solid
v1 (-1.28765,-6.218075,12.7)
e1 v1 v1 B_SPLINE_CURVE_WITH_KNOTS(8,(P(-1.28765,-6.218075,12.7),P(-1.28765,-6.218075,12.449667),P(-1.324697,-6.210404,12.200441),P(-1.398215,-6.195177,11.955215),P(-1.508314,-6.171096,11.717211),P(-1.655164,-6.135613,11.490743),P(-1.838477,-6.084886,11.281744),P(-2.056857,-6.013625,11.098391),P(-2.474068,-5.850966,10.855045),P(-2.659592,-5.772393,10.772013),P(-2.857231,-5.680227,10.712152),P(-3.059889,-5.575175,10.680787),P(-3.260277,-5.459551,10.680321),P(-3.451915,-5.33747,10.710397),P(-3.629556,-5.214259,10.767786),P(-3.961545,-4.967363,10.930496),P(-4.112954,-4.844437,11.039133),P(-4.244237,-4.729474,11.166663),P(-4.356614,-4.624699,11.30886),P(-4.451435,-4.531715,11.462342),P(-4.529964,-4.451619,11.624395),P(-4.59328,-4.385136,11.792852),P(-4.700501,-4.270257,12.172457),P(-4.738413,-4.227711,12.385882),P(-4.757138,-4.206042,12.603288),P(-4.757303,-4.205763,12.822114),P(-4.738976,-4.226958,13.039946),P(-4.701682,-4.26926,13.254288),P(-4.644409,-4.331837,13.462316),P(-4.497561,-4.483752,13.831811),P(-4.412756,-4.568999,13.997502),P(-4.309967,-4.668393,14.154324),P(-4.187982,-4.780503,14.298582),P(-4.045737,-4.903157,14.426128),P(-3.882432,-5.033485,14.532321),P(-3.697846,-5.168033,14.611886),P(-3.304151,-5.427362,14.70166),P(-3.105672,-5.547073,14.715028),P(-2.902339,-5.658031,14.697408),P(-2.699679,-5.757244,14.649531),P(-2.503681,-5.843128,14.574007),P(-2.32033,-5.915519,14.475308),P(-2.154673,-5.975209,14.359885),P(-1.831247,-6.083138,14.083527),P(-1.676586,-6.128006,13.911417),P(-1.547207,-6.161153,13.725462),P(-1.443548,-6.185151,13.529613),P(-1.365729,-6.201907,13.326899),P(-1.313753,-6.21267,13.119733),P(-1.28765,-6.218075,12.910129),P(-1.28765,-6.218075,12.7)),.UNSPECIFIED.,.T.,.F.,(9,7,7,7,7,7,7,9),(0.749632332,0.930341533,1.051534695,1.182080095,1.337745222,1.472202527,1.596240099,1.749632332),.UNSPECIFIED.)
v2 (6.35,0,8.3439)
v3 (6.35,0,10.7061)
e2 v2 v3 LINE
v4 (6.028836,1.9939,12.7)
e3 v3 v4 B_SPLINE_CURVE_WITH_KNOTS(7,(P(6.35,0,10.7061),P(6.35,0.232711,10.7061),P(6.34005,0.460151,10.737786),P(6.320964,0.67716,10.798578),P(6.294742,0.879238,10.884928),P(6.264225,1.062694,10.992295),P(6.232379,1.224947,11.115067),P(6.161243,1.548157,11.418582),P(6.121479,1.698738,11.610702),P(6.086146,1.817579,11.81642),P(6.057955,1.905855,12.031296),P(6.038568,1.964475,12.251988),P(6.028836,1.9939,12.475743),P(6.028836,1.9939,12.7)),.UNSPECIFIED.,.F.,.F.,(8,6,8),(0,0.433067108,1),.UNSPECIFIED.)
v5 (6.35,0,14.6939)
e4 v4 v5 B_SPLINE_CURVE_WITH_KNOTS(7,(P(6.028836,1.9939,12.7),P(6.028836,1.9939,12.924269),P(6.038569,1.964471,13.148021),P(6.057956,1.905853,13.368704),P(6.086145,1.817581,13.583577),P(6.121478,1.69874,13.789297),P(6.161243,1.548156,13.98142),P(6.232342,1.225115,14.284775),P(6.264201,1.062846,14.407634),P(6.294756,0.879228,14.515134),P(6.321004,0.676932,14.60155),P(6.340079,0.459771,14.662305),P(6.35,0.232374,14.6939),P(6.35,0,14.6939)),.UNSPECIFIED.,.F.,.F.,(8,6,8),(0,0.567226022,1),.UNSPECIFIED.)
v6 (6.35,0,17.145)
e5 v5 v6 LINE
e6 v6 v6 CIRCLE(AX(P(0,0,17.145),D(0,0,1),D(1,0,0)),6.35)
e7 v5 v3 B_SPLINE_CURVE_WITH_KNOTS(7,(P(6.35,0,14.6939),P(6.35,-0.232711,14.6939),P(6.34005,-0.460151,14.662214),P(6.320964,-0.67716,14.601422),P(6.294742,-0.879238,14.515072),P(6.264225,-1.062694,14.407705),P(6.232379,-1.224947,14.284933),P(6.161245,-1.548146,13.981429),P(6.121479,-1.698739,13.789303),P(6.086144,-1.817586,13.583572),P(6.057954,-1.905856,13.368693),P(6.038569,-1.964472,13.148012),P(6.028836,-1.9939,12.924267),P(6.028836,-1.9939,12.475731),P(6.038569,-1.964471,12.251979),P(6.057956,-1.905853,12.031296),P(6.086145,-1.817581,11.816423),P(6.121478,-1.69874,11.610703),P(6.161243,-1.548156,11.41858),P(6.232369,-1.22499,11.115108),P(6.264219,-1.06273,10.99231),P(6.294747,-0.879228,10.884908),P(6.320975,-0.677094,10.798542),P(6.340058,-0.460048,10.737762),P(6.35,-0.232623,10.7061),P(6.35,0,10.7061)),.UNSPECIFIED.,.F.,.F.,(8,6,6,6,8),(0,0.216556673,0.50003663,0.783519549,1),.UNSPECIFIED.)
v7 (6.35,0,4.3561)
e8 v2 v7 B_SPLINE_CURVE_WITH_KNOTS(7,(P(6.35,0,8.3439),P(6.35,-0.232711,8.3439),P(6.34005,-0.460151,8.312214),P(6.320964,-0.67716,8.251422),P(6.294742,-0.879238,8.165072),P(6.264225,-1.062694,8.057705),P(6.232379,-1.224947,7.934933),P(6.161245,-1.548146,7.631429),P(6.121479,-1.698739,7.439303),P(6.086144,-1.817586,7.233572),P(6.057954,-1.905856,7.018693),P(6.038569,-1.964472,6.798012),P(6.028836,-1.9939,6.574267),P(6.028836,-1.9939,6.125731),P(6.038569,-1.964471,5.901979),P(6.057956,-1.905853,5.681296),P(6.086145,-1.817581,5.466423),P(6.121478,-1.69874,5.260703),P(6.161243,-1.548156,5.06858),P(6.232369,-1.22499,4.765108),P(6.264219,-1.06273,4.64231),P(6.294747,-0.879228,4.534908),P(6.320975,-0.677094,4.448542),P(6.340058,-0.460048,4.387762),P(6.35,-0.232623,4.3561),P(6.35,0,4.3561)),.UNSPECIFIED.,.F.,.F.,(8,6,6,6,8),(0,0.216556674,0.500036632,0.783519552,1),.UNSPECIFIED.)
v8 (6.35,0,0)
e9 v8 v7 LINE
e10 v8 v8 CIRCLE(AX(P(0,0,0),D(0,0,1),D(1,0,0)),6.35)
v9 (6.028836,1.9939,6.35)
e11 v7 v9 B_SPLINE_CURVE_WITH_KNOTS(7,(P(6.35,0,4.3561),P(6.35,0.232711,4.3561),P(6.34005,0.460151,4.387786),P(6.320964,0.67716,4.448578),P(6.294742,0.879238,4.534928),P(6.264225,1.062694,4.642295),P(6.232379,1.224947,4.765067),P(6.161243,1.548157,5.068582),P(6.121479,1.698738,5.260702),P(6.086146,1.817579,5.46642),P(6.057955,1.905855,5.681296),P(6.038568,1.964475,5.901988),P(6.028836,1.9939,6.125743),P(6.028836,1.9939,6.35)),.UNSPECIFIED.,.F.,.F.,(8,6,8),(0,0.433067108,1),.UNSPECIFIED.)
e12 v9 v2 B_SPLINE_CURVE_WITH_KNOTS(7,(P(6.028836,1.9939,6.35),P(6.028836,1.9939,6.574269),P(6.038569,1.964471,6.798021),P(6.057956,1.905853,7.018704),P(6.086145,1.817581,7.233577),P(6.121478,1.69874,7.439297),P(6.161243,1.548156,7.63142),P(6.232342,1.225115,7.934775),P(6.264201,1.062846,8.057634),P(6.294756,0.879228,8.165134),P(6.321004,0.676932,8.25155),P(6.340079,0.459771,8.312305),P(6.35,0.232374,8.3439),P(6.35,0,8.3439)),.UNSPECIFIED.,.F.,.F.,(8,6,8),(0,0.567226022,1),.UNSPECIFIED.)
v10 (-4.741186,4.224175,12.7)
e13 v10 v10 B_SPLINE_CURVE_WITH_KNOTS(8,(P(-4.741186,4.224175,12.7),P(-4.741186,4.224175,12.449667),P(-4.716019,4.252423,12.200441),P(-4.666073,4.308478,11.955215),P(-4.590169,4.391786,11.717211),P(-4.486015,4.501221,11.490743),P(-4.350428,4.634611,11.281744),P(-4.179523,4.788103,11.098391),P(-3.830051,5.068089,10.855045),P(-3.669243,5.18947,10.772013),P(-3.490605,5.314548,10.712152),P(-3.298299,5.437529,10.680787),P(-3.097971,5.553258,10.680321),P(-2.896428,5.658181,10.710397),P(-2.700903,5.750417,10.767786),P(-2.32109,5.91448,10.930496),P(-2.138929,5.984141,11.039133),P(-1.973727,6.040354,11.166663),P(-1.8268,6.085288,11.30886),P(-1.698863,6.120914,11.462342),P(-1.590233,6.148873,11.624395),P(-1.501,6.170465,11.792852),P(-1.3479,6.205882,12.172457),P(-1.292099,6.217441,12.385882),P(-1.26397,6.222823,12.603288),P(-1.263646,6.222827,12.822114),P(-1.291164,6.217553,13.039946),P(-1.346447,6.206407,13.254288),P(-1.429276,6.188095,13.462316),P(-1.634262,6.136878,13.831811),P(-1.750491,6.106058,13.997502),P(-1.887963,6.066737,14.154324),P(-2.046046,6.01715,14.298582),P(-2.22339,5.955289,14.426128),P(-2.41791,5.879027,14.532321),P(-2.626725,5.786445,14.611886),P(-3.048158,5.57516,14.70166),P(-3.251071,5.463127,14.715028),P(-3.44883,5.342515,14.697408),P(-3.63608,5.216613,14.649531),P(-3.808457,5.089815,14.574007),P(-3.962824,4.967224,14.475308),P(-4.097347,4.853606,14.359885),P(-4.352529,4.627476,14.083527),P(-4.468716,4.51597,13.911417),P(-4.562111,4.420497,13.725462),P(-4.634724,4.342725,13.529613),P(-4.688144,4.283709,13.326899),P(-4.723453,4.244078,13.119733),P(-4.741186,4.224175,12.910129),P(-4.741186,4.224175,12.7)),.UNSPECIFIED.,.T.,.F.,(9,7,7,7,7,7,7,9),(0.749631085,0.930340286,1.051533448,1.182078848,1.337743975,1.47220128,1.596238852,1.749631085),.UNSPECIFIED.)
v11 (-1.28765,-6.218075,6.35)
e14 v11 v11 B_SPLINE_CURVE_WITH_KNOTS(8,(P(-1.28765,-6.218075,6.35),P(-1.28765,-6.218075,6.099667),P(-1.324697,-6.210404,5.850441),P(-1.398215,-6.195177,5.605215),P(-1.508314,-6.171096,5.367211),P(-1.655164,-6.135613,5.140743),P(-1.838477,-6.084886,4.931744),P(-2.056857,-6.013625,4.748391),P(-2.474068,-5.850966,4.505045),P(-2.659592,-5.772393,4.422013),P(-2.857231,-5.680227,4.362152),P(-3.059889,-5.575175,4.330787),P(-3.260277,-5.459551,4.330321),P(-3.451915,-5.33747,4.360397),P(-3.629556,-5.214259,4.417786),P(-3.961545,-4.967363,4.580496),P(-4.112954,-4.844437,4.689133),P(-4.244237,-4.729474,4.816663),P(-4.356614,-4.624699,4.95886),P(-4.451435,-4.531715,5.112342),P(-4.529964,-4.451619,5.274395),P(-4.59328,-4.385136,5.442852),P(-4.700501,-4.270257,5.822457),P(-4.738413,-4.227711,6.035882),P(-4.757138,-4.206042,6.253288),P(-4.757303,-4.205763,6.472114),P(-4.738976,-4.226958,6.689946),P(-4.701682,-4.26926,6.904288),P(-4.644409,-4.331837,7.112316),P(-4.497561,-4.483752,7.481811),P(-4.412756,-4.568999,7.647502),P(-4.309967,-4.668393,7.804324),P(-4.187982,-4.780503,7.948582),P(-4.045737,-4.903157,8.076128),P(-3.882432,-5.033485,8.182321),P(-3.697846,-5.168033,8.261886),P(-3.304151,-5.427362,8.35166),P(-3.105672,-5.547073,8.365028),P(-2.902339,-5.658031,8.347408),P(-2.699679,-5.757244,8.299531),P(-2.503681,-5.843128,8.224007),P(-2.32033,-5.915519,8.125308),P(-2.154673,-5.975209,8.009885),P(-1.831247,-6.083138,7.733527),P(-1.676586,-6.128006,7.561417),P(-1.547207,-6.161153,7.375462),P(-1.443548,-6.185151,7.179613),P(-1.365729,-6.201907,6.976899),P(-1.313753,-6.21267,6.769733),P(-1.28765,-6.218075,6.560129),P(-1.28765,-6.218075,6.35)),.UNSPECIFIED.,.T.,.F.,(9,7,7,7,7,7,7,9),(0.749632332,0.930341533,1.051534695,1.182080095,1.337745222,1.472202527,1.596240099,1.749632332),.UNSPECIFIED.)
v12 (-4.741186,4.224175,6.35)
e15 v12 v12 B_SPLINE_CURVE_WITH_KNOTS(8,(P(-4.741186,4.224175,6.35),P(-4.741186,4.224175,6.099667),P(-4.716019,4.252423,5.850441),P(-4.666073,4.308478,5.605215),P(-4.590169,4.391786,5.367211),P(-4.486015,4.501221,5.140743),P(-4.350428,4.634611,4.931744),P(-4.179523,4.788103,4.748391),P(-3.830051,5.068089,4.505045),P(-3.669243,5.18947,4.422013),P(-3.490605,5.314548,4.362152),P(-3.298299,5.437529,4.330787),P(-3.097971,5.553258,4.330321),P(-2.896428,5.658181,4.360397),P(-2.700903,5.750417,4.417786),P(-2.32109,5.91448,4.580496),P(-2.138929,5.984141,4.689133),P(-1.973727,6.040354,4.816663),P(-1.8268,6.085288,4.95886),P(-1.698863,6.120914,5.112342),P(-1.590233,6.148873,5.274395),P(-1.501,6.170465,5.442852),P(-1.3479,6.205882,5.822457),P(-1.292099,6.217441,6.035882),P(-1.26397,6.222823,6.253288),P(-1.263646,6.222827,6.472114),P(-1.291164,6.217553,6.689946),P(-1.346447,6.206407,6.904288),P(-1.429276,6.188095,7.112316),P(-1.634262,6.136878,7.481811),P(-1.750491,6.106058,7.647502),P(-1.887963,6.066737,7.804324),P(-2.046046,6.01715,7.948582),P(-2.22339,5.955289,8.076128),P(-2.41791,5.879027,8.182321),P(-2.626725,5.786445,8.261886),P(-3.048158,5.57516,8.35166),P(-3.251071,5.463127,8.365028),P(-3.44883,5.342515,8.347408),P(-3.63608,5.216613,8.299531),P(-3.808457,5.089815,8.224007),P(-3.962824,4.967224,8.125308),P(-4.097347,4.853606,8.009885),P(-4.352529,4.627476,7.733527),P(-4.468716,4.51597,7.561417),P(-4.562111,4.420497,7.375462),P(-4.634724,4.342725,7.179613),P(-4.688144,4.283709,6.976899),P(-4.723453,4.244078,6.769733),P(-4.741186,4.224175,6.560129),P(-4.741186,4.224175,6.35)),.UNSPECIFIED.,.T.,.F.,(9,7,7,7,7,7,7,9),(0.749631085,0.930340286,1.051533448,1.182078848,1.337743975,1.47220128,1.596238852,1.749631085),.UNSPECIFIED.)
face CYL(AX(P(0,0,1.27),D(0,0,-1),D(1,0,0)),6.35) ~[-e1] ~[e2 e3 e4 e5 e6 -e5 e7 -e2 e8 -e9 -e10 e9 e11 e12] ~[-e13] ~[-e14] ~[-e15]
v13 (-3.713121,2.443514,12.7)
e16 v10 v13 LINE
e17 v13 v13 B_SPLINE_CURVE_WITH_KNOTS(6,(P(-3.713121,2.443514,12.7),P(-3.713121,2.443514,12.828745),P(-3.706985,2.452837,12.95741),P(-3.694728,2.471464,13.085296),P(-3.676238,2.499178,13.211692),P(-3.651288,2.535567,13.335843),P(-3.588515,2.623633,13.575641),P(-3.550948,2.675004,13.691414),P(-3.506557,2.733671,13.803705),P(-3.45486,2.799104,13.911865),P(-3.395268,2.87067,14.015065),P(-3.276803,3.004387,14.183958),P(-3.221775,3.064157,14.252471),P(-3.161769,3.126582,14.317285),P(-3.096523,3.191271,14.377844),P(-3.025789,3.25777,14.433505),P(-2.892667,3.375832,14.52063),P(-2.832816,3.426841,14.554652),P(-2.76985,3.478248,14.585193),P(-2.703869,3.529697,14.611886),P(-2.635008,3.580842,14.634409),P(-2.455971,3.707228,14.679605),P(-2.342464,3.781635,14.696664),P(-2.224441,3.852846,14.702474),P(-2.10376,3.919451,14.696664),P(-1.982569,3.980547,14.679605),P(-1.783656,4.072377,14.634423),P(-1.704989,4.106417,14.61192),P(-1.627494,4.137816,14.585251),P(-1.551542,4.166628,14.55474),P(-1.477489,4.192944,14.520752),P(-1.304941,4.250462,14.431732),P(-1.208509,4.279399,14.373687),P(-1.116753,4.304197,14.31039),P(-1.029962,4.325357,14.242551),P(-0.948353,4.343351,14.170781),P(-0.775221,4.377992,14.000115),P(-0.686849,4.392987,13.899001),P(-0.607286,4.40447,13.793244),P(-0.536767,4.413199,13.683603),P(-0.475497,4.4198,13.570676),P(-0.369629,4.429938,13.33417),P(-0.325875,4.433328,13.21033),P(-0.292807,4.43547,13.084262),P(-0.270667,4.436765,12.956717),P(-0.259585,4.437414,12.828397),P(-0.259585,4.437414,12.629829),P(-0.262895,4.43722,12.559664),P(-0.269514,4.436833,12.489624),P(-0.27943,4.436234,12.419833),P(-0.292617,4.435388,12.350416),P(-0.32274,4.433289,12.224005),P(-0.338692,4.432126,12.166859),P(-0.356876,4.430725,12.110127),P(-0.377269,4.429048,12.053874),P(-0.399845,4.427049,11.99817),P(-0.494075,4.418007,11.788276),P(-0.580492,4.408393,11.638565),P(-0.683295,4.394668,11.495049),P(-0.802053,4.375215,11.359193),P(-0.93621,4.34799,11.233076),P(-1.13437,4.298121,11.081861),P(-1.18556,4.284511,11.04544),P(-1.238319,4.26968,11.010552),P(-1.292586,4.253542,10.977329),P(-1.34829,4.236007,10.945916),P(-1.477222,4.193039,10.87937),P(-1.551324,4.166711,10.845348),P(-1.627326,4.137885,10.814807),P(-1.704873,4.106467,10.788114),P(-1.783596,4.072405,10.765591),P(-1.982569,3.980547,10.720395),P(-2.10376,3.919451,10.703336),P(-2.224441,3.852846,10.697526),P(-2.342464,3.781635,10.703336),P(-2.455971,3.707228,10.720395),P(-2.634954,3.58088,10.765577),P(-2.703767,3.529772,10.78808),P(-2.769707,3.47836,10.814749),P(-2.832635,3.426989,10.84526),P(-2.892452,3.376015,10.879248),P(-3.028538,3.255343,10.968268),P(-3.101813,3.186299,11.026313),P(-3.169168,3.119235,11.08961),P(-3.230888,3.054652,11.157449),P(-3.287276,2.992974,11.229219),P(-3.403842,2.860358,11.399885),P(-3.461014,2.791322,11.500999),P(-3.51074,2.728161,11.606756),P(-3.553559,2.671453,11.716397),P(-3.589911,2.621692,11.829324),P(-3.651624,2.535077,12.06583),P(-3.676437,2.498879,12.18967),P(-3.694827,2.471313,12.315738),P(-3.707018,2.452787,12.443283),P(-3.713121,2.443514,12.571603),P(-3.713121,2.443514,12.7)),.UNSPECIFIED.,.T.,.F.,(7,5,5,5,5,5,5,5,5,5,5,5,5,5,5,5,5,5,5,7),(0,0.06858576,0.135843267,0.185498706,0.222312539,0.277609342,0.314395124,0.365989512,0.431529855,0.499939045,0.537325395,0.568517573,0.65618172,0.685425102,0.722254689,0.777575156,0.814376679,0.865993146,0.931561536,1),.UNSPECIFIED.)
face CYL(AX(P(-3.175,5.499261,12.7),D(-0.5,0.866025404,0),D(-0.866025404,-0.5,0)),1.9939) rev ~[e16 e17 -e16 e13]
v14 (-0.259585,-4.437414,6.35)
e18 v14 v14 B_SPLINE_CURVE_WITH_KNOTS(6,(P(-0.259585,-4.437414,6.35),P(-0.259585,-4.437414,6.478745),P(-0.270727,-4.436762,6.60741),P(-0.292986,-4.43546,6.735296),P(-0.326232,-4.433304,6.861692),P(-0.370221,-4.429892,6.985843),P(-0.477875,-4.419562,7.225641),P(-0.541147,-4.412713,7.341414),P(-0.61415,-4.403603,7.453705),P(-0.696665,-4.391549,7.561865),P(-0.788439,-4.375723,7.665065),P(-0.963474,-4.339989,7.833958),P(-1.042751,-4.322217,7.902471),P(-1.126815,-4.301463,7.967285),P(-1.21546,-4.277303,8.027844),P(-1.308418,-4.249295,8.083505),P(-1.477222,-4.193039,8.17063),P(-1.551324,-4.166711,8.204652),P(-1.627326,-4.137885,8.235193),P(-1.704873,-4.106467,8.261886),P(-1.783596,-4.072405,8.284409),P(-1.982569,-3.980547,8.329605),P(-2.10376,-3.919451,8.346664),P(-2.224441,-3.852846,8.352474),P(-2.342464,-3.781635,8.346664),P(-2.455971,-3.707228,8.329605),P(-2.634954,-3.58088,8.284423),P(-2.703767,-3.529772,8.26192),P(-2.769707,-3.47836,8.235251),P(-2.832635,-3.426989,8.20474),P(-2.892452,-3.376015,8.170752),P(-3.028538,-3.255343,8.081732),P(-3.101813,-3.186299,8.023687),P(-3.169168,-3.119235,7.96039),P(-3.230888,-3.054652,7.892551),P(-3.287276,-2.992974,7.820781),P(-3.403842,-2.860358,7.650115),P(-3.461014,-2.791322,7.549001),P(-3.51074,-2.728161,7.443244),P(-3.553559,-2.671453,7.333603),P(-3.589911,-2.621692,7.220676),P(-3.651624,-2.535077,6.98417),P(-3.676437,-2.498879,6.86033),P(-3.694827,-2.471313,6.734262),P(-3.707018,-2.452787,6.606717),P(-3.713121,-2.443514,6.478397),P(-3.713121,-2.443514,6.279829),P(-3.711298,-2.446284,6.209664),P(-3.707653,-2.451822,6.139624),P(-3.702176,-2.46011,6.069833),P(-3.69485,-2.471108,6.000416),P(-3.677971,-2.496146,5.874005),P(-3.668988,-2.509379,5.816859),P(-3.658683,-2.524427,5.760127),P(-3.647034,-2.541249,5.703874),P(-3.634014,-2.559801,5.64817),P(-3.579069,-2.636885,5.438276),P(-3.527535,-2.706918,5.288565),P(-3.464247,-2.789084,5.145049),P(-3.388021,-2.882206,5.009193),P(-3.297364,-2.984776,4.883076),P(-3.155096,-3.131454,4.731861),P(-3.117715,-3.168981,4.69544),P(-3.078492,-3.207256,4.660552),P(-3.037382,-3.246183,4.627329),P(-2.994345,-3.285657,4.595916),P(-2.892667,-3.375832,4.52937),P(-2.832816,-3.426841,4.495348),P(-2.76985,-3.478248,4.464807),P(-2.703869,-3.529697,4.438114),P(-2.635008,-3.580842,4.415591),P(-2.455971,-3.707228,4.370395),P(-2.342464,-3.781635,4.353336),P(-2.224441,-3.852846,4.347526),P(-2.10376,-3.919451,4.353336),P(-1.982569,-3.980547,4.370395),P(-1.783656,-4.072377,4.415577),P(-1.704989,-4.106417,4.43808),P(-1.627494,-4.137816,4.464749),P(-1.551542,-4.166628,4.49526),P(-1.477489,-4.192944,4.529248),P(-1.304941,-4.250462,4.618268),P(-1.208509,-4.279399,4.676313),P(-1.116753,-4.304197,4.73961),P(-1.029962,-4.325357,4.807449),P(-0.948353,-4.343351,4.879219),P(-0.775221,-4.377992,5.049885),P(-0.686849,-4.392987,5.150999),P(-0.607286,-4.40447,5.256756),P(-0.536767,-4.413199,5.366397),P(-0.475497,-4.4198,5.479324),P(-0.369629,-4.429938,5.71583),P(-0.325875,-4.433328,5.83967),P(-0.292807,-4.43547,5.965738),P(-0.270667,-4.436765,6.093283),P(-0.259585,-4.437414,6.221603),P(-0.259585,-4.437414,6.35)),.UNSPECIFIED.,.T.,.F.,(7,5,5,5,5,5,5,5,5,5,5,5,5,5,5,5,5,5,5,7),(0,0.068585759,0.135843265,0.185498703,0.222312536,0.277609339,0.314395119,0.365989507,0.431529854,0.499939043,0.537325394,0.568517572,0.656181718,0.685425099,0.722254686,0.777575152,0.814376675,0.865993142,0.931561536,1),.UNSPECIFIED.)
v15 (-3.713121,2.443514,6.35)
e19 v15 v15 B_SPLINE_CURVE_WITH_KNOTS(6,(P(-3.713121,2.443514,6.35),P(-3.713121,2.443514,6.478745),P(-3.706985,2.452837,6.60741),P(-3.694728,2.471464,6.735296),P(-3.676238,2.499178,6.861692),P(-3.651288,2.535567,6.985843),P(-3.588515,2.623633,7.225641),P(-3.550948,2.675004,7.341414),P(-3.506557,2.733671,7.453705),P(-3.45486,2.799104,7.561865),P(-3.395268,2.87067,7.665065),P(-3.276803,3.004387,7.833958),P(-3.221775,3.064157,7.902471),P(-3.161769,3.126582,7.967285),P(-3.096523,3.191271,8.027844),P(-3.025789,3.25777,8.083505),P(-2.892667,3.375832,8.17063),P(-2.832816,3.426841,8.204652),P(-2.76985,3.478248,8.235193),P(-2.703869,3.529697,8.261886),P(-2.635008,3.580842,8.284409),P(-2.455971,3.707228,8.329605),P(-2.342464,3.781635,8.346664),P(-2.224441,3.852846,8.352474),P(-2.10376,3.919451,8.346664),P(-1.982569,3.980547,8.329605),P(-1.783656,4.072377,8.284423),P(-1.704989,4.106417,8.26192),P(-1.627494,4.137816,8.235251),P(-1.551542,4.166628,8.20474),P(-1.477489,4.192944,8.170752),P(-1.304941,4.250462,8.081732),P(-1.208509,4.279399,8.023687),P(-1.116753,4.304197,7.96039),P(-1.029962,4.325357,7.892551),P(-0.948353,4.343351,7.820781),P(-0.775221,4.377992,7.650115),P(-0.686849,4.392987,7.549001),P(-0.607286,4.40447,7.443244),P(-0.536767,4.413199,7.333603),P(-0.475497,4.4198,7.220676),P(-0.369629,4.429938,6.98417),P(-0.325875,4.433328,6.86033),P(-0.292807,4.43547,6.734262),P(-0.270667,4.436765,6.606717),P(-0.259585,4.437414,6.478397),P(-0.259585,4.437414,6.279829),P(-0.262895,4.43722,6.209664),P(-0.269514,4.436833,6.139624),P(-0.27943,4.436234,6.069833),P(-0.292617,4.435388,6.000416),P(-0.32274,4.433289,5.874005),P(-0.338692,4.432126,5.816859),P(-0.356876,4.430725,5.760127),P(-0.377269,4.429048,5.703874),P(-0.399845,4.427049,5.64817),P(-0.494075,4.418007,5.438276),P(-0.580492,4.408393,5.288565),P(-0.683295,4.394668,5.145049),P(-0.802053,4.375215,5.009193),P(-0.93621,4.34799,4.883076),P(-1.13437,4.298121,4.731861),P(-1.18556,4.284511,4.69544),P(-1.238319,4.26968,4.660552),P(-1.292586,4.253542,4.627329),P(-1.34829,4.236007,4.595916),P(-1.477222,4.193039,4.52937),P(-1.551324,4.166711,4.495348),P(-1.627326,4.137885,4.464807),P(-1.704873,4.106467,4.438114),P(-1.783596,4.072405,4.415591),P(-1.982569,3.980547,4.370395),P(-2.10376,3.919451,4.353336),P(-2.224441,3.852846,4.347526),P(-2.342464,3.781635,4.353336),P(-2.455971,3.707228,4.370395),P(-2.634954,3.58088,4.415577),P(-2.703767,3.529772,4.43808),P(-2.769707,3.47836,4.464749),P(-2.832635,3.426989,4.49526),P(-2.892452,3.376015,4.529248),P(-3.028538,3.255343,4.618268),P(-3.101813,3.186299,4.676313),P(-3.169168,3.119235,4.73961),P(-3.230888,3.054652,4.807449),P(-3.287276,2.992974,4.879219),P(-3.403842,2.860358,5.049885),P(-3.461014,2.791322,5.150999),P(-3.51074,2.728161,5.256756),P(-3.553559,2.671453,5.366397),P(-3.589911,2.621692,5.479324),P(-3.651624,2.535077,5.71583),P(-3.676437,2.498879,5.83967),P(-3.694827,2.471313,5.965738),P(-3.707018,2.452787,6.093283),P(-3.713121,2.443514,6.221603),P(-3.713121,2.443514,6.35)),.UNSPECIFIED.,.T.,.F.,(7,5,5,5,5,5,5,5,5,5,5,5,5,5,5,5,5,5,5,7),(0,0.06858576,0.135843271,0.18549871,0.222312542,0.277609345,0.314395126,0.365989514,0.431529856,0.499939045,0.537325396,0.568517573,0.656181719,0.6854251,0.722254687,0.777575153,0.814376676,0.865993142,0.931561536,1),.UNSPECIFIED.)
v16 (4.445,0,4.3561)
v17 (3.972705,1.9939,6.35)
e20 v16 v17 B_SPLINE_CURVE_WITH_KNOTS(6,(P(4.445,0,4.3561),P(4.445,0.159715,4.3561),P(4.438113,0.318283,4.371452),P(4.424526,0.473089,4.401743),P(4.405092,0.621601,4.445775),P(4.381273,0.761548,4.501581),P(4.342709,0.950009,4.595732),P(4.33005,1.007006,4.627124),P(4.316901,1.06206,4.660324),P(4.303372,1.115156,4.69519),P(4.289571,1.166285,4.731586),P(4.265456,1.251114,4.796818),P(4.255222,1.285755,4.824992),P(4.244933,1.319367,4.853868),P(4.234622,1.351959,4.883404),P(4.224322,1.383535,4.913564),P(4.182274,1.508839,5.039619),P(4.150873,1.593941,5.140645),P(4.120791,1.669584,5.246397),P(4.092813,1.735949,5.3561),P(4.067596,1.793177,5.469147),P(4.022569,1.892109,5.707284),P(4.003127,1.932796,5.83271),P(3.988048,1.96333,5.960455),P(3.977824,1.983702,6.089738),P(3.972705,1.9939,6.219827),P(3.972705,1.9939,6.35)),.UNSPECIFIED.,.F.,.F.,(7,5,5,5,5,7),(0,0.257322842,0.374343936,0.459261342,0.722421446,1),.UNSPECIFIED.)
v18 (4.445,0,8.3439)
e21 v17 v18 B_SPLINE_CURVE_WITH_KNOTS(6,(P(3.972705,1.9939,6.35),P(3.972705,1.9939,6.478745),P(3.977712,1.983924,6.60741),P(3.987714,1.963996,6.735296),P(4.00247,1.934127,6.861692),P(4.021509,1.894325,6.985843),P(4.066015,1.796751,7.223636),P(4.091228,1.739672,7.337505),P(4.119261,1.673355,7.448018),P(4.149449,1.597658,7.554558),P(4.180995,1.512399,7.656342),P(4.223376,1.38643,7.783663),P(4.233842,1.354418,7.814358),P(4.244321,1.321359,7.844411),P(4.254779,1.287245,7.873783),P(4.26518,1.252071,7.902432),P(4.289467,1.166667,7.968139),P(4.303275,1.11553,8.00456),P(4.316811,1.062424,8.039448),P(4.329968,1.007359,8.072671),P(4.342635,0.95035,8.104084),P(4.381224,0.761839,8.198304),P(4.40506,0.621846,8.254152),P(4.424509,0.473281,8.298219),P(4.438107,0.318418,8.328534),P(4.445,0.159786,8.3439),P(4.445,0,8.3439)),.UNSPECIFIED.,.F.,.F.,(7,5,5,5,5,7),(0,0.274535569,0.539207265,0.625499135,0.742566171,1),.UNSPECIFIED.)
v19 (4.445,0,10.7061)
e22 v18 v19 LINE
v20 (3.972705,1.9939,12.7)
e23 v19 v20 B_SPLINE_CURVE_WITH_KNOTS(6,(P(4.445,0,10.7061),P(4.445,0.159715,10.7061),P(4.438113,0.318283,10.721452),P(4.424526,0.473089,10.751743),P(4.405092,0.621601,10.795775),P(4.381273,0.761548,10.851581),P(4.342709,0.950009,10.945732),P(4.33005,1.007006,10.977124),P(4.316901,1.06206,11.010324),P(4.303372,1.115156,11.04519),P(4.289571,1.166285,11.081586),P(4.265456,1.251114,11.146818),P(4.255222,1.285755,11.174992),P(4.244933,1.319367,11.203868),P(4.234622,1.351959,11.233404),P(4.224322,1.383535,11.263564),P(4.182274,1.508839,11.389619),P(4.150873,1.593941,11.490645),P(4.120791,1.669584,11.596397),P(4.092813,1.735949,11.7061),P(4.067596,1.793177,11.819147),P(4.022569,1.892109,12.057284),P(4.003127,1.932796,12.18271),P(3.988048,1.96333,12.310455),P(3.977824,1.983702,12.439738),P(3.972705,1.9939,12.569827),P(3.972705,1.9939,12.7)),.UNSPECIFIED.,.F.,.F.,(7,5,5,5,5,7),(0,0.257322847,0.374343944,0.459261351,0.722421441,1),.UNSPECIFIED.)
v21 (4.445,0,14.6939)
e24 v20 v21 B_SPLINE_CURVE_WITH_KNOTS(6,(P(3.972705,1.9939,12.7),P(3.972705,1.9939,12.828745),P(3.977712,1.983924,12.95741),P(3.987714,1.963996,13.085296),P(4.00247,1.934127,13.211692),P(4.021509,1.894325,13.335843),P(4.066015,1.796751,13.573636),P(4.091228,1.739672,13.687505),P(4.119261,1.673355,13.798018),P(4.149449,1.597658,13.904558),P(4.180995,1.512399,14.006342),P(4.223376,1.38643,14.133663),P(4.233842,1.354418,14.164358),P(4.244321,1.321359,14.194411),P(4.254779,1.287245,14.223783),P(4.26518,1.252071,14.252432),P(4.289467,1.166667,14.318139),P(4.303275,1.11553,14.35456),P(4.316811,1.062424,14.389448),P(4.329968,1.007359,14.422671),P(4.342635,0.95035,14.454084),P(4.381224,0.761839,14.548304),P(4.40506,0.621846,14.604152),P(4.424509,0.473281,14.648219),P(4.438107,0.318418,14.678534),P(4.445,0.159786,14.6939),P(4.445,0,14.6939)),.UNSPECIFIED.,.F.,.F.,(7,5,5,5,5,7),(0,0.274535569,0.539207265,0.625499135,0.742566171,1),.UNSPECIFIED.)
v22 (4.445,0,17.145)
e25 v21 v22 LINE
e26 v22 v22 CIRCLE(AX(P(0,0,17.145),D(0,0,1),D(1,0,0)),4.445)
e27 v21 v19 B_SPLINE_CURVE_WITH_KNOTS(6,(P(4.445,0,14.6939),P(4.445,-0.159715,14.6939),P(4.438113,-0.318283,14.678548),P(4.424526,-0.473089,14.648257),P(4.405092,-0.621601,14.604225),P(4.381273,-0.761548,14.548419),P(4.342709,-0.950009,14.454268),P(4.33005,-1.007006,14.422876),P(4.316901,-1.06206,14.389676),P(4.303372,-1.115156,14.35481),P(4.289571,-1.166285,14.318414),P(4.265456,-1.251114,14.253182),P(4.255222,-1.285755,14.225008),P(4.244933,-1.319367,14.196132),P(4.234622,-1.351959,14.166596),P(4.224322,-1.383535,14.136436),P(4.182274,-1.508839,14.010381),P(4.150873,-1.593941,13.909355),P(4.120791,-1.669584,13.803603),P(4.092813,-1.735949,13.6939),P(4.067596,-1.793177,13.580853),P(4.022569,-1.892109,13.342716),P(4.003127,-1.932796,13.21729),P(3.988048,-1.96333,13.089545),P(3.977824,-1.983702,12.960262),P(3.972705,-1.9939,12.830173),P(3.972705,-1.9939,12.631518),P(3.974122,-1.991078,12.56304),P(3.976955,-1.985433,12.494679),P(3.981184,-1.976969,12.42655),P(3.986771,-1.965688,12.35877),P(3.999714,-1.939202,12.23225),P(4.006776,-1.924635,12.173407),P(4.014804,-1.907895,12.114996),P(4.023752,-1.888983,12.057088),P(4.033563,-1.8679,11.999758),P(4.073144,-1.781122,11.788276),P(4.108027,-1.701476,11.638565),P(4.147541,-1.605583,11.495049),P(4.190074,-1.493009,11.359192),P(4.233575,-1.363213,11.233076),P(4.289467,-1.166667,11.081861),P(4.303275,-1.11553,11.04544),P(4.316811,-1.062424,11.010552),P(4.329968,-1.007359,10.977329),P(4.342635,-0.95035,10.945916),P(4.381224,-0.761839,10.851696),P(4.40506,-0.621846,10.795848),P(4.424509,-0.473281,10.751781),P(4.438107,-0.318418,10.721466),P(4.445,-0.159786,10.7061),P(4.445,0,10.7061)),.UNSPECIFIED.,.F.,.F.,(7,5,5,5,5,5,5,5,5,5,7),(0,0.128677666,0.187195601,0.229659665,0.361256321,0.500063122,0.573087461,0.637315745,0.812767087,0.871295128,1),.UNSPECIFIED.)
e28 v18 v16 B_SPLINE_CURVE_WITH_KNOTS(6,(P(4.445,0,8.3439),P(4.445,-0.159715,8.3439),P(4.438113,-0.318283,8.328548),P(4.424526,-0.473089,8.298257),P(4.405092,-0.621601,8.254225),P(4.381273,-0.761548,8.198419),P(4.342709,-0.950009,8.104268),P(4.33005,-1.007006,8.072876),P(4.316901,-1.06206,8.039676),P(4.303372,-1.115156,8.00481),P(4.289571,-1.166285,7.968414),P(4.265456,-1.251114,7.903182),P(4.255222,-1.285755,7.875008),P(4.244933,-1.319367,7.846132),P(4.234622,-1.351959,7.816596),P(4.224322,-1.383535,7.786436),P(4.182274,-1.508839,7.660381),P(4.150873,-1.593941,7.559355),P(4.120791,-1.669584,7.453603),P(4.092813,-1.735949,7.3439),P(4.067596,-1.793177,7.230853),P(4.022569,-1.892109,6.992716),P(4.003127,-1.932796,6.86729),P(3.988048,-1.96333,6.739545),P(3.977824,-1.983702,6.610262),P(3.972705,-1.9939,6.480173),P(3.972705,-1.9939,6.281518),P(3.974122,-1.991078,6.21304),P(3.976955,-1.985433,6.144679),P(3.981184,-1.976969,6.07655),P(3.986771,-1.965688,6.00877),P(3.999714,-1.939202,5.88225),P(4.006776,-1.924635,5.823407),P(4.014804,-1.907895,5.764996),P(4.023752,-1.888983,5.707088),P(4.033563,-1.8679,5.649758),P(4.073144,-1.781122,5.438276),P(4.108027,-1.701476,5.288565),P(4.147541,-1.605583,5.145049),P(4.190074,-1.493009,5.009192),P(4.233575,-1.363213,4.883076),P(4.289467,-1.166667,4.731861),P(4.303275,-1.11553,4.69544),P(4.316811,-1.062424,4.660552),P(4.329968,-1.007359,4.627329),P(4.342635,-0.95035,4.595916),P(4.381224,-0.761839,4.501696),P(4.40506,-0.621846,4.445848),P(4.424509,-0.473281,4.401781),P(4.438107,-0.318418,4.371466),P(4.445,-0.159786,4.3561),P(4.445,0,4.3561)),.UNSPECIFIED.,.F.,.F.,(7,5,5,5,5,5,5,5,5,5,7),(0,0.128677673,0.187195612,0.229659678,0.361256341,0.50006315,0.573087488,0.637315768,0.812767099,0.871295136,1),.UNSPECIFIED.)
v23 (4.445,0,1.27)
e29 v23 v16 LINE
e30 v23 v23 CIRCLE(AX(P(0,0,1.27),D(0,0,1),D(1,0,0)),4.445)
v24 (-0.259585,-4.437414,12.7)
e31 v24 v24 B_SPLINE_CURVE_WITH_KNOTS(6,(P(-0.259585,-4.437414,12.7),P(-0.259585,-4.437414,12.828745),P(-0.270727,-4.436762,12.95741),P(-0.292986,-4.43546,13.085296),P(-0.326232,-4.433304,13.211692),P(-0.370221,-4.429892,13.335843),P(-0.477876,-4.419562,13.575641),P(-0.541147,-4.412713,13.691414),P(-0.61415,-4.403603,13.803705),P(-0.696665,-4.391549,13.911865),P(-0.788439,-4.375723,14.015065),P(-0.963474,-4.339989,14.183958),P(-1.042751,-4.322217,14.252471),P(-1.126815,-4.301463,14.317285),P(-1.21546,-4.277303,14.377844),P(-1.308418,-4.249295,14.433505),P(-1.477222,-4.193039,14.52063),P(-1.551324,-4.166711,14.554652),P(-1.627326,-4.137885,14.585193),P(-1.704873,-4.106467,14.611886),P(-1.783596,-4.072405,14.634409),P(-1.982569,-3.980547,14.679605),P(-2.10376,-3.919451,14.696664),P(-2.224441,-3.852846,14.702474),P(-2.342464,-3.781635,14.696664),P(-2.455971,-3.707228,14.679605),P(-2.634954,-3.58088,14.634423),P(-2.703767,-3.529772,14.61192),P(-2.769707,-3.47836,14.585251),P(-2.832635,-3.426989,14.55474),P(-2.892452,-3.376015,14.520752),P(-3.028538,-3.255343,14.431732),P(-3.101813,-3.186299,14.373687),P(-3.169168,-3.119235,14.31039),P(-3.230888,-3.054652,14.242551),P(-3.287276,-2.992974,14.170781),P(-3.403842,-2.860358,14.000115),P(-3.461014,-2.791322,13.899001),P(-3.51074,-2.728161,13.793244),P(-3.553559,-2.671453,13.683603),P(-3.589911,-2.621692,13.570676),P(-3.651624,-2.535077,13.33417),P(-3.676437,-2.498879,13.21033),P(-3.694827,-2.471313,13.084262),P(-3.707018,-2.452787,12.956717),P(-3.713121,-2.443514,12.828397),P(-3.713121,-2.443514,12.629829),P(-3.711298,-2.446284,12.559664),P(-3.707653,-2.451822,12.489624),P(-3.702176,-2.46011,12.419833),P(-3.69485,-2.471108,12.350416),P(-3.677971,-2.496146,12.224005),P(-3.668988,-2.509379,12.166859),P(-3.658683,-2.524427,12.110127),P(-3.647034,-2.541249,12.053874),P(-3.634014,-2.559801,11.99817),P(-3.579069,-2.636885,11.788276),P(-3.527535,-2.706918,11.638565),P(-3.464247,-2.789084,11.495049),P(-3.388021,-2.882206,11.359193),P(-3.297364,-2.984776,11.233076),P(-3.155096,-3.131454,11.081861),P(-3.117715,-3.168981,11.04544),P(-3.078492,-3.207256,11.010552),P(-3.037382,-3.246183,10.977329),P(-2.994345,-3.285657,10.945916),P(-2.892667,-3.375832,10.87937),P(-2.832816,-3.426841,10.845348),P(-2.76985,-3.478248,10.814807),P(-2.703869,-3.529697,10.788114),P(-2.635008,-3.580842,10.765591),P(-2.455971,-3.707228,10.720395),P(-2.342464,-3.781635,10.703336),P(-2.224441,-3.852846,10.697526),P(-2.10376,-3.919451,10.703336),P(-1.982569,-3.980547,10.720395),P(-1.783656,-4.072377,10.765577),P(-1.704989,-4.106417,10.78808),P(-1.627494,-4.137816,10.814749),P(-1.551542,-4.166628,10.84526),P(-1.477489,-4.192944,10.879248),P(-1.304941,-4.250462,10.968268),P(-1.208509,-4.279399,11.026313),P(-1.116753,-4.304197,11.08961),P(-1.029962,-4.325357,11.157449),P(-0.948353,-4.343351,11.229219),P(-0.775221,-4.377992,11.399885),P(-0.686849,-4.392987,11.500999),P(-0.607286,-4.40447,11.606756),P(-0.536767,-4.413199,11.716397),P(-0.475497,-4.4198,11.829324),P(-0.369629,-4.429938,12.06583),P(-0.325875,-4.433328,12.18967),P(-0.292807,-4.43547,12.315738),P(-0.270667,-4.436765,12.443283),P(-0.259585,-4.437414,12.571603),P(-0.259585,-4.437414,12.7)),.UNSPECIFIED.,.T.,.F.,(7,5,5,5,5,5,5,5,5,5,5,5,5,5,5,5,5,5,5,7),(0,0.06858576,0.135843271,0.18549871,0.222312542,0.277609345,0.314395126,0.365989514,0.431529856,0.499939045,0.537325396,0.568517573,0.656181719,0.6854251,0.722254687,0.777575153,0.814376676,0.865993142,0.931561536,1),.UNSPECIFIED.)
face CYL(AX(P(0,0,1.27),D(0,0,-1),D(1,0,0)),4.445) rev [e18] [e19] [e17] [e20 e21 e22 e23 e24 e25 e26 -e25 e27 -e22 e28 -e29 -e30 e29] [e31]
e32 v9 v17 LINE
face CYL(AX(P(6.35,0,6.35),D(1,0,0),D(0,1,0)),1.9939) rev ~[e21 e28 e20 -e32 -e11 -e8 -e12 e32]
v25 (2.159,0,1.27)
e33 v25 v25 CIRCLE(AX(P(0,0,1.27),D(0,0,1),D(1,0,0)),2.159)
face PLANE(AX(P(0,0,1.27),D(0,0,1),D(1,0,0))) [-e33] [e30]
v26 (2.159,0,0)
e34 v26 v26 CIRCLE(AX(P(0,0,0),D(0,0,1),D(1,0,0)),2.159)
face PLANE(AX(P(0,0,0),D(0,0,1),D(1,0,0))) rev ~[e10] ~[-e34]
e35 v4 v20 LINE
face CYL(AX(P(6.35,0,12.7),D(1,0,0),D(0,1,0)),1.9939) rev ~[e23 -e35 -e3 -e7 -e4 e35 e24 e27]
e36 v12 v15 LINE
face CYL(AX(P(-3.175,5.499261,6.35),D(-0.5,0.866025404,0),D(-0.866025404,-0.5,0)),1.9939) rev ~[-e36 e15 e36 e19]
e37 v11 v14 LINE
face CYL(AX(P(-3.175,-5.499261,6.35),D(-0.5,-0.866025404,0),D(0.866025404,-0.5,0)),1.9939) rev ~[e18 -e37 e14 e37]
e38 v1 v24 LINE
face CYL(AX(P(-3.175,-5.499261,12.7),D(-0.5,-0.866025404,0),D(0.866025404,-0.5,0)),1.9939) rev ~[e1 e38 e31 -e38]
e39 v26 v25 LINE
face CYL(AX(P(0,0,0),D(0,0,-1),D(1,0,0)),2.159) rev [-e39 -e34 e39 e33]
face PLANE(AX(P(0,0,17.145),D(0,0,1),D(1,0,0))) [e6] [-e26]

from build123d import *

# Parameters (mm, degrees)
F0_R       = 6.35
F0_R_2     = 2.159
F1_DEPTH   = 1.27
F2_R       = 6.35
F2_R_2     = 4.445
F3_DEPTH   = 15.875
F5_R       = 1.9939
F6_DEPTH   = 6.35
F7_COUNT   = 3
F8_R       = 1.9939
F6_FACE_R  = 1.9939
F9_DEPTH   = 6.35
F7_FACE_R  = 1.9939
F10_R      = 1.9939
F11_DEPTH  = 6.35
F7_FACE1_R = 1.9939
F12_R      = 1.9939
F13_DEPTH  = 6.35


with BuildPart() as f1:
    # F0 (on Top) → F1 (new body)
    with BuildSketch(Plane.XY):
        Circle(F0_R)
        Circle(F0_R_2, mode=Mode.SUBTRACT)
    extrude(amount=F1_DEPTH)

    # F2 (on face) → F3 (join)
    with BuildSketch(Plane.XY.offset(1.27)):
        Circle(F2_R)
        Circle(F2_R_2, mode=Mode.SUBTRACT)
    extrude(amount=F3_DEPTH)


with BuildPart() as f6:
    # F5 (on offset) → F6 (new body)
    with BuildSketch(Plane.YZ.offset(6.35)):
        with Locations((0, 6.35)):
            Circle(F5_R)
    extrude(amount=-F6_DEPTH)


with BuildPart() as f6b:
    # F5 (on offset) → F6, piece 2 (new body)
    with BuildSketch(Plane.YZ.offset(6.35)):
        with Locations((0, 12.7)):
            Circle(F5_R)
    extrude(amount=-F6_DEPTH)


with BuildPart() as f7_1:
    # F7: instance of F6
    add(f6.part.rotate(Axis((0, 0, 17.145), (0, 0, 1)), 1 * 360 / F7_COUNT))


with BuildPart() as f7_2:
    # F7: instance of F6
    add(f6.part.rotate(Axis((0, 0, 17.145), (0, 0, 1)), 2 * 360 / F7_COUNT))


with BuildPart() as f7_3:
    # F7: instance of F6b
    add(f6b.part.rotate(Axis((0, 0, 17.145), (0, 0, 1)), 1 * 360 / F7_COUNT))


with BuildPart() as f7_4:
    # F7: instance of F6b
    add(f6b.part.rotate(Axis((0, 0, 17.145), (0, 0, 1)), 2 * 360 / F7_COUNT))


with BuildPart() as f9_tool:
    # F8 (on face) + F6_face (on face) → F9 (new body)
    with BuildSketch(Plane.YZ.offset(6.35)):
        with Locations((0, 6.35)):
            Circle(F8_R)
    with BuildSketch(Plane(origin=(6.35, 0, 6.35), x_dir=(0, 1, 0), z_dir=(1, 0, 0))):
        with Locations((0, 6.35)):
            Circle(F6_FACE_R)
    extrude(amount=-F9_DEPTH)


with BuildPart() as f1_1:
    add(f1.part)

    # F9: cut by f9_tool
    add(f9_tool.part, mode=Mode.SUBTRACT)


with BuildPart() as f6_1:
    add(f6.part)

    # F9: cut by f9_tool
    add(f9_tool.part, mode=Mode.SUBTRACT)


with BuildPart() as f6b_1:
    add(f6b.part)

    # F9: cut by f9_tool
    add(f9_tool.part, mode=Mode.SUBTRACT)


with BuildPart() as f7_1_1:
    add(f7_1.part)

    # F9: cut by f9_tool
    add(f9_tool.part, mode=Mode.SUBTRACT)


with BuildPart() as f7_2_1:
    add(f7_2.part)

    # F9: cut by f9_tool
    add(f9_tool.part, mode=Mode.SUBTRACT)


with BuildPart() as f7_3_1:
    add(f7_3.part)

    # F9: cut by f9_tool
    add(f9_tool.part, mode=Mode.SUBTRACT)


with BuildPart() as f7_4_1:
    add(f7_4.part)

    # F9: cut by f9_tool
    add(f9_tool.part, mode=Mode.SUBTRACT)


with BuildPart() as f11_tool:
    # F7_face (on face) + F10 (on face) → F11 (new body)
    with BuildSketch(Plane(origin=(-3.175, 5.499261314, 6.35), x_dir=(-0.8660254038, -0.5, 0), z_dir=(-0.5, 0.8660254038, 0))):
        with Locations((0, 6.35)):
            Circle(F7_FACE_R)
    with BuildSketch(Plane(origin=(-3.175, 5.499261314, 0), x_dir=(-0.8660254038, -0.5, 0), z_dir=(-0.5, 0.8660254038, 0))):
        with Locations((0, 6.35)):
            Circle(F10_R)
    extrude(amount=-F11_DEPTH)


with BuildPart() as f1_2:
    add(f1_1.part)

    # F11: cut by f11_tool
    add(f11_tool.part, mode=Mode.SUBTRACT)


with BuildPart() as f7_1_2:
    add(f7_1_1.part)

    # F11: cut by f11_tool
    add(f11_tool.part, mode=Mode.SUBTRACT)


with BuildPart() as f7_2_2:
    add(f7_2_1.part)

    # F11: cut by f11_tool
    add(f11_tool.part, mode=Mode.SUBTRACT)


with BuildPart() as f7_3_2:
    add(f7_3_1.part)

    # F11: cut by f11_tool
    add(f11_tool.part, mode=Mode.SUBTRACT)


with BuildPart() as f7_4_2:
    add(f7_4_1.part)

    # F11: cut by f11_tool
    add(f11_tool.part, mode=Mode.SUBTRACT)


with BuildPart() as f13_tool:
    # F7_face1 (on face) + F12 (on face) → F13 (new body)
    with BuildSketch(Plane(origin=(-3.175, -5.499261314, 6.35), x_dir=(0.8660254038, -0.5, 0), z_dir=(-0.5, -0.8660254038, 0))):
        with Locations((0, 6.35)):
            Circle(F7_FACE1_R)
    with BuildSketch(Plane(origin=(-3.175, -5.499261314, 0), x_dir=(0.8660254038, -0.5, 0), z_dir=(-0.5, -0.8660254038, 0))):
        with Locations((0, 6.35)):
            Circle(F12_R)
    extrude(amount=-F13_DEPTH)


with BuildPart() as f1_3:
    add(f1_2.part)

    # F13: cut by f13_tool
    add(f13_tool.part, mode=Mode.SUBTRACT)


with BuildPart() as f7_2_3:
    add(f7_2_2.part)

    # F13: cut by f13_tool
    add(f13_tool.part, mode=Mode.SUBTRACT)


with BuildPart() as f7_4_3:
    add(f7_4_2.part)

    # F13: cut by f13_tool
    add(f13_tool.part, mode=Mode.SUBTRACT)


solid = f1_3.part
